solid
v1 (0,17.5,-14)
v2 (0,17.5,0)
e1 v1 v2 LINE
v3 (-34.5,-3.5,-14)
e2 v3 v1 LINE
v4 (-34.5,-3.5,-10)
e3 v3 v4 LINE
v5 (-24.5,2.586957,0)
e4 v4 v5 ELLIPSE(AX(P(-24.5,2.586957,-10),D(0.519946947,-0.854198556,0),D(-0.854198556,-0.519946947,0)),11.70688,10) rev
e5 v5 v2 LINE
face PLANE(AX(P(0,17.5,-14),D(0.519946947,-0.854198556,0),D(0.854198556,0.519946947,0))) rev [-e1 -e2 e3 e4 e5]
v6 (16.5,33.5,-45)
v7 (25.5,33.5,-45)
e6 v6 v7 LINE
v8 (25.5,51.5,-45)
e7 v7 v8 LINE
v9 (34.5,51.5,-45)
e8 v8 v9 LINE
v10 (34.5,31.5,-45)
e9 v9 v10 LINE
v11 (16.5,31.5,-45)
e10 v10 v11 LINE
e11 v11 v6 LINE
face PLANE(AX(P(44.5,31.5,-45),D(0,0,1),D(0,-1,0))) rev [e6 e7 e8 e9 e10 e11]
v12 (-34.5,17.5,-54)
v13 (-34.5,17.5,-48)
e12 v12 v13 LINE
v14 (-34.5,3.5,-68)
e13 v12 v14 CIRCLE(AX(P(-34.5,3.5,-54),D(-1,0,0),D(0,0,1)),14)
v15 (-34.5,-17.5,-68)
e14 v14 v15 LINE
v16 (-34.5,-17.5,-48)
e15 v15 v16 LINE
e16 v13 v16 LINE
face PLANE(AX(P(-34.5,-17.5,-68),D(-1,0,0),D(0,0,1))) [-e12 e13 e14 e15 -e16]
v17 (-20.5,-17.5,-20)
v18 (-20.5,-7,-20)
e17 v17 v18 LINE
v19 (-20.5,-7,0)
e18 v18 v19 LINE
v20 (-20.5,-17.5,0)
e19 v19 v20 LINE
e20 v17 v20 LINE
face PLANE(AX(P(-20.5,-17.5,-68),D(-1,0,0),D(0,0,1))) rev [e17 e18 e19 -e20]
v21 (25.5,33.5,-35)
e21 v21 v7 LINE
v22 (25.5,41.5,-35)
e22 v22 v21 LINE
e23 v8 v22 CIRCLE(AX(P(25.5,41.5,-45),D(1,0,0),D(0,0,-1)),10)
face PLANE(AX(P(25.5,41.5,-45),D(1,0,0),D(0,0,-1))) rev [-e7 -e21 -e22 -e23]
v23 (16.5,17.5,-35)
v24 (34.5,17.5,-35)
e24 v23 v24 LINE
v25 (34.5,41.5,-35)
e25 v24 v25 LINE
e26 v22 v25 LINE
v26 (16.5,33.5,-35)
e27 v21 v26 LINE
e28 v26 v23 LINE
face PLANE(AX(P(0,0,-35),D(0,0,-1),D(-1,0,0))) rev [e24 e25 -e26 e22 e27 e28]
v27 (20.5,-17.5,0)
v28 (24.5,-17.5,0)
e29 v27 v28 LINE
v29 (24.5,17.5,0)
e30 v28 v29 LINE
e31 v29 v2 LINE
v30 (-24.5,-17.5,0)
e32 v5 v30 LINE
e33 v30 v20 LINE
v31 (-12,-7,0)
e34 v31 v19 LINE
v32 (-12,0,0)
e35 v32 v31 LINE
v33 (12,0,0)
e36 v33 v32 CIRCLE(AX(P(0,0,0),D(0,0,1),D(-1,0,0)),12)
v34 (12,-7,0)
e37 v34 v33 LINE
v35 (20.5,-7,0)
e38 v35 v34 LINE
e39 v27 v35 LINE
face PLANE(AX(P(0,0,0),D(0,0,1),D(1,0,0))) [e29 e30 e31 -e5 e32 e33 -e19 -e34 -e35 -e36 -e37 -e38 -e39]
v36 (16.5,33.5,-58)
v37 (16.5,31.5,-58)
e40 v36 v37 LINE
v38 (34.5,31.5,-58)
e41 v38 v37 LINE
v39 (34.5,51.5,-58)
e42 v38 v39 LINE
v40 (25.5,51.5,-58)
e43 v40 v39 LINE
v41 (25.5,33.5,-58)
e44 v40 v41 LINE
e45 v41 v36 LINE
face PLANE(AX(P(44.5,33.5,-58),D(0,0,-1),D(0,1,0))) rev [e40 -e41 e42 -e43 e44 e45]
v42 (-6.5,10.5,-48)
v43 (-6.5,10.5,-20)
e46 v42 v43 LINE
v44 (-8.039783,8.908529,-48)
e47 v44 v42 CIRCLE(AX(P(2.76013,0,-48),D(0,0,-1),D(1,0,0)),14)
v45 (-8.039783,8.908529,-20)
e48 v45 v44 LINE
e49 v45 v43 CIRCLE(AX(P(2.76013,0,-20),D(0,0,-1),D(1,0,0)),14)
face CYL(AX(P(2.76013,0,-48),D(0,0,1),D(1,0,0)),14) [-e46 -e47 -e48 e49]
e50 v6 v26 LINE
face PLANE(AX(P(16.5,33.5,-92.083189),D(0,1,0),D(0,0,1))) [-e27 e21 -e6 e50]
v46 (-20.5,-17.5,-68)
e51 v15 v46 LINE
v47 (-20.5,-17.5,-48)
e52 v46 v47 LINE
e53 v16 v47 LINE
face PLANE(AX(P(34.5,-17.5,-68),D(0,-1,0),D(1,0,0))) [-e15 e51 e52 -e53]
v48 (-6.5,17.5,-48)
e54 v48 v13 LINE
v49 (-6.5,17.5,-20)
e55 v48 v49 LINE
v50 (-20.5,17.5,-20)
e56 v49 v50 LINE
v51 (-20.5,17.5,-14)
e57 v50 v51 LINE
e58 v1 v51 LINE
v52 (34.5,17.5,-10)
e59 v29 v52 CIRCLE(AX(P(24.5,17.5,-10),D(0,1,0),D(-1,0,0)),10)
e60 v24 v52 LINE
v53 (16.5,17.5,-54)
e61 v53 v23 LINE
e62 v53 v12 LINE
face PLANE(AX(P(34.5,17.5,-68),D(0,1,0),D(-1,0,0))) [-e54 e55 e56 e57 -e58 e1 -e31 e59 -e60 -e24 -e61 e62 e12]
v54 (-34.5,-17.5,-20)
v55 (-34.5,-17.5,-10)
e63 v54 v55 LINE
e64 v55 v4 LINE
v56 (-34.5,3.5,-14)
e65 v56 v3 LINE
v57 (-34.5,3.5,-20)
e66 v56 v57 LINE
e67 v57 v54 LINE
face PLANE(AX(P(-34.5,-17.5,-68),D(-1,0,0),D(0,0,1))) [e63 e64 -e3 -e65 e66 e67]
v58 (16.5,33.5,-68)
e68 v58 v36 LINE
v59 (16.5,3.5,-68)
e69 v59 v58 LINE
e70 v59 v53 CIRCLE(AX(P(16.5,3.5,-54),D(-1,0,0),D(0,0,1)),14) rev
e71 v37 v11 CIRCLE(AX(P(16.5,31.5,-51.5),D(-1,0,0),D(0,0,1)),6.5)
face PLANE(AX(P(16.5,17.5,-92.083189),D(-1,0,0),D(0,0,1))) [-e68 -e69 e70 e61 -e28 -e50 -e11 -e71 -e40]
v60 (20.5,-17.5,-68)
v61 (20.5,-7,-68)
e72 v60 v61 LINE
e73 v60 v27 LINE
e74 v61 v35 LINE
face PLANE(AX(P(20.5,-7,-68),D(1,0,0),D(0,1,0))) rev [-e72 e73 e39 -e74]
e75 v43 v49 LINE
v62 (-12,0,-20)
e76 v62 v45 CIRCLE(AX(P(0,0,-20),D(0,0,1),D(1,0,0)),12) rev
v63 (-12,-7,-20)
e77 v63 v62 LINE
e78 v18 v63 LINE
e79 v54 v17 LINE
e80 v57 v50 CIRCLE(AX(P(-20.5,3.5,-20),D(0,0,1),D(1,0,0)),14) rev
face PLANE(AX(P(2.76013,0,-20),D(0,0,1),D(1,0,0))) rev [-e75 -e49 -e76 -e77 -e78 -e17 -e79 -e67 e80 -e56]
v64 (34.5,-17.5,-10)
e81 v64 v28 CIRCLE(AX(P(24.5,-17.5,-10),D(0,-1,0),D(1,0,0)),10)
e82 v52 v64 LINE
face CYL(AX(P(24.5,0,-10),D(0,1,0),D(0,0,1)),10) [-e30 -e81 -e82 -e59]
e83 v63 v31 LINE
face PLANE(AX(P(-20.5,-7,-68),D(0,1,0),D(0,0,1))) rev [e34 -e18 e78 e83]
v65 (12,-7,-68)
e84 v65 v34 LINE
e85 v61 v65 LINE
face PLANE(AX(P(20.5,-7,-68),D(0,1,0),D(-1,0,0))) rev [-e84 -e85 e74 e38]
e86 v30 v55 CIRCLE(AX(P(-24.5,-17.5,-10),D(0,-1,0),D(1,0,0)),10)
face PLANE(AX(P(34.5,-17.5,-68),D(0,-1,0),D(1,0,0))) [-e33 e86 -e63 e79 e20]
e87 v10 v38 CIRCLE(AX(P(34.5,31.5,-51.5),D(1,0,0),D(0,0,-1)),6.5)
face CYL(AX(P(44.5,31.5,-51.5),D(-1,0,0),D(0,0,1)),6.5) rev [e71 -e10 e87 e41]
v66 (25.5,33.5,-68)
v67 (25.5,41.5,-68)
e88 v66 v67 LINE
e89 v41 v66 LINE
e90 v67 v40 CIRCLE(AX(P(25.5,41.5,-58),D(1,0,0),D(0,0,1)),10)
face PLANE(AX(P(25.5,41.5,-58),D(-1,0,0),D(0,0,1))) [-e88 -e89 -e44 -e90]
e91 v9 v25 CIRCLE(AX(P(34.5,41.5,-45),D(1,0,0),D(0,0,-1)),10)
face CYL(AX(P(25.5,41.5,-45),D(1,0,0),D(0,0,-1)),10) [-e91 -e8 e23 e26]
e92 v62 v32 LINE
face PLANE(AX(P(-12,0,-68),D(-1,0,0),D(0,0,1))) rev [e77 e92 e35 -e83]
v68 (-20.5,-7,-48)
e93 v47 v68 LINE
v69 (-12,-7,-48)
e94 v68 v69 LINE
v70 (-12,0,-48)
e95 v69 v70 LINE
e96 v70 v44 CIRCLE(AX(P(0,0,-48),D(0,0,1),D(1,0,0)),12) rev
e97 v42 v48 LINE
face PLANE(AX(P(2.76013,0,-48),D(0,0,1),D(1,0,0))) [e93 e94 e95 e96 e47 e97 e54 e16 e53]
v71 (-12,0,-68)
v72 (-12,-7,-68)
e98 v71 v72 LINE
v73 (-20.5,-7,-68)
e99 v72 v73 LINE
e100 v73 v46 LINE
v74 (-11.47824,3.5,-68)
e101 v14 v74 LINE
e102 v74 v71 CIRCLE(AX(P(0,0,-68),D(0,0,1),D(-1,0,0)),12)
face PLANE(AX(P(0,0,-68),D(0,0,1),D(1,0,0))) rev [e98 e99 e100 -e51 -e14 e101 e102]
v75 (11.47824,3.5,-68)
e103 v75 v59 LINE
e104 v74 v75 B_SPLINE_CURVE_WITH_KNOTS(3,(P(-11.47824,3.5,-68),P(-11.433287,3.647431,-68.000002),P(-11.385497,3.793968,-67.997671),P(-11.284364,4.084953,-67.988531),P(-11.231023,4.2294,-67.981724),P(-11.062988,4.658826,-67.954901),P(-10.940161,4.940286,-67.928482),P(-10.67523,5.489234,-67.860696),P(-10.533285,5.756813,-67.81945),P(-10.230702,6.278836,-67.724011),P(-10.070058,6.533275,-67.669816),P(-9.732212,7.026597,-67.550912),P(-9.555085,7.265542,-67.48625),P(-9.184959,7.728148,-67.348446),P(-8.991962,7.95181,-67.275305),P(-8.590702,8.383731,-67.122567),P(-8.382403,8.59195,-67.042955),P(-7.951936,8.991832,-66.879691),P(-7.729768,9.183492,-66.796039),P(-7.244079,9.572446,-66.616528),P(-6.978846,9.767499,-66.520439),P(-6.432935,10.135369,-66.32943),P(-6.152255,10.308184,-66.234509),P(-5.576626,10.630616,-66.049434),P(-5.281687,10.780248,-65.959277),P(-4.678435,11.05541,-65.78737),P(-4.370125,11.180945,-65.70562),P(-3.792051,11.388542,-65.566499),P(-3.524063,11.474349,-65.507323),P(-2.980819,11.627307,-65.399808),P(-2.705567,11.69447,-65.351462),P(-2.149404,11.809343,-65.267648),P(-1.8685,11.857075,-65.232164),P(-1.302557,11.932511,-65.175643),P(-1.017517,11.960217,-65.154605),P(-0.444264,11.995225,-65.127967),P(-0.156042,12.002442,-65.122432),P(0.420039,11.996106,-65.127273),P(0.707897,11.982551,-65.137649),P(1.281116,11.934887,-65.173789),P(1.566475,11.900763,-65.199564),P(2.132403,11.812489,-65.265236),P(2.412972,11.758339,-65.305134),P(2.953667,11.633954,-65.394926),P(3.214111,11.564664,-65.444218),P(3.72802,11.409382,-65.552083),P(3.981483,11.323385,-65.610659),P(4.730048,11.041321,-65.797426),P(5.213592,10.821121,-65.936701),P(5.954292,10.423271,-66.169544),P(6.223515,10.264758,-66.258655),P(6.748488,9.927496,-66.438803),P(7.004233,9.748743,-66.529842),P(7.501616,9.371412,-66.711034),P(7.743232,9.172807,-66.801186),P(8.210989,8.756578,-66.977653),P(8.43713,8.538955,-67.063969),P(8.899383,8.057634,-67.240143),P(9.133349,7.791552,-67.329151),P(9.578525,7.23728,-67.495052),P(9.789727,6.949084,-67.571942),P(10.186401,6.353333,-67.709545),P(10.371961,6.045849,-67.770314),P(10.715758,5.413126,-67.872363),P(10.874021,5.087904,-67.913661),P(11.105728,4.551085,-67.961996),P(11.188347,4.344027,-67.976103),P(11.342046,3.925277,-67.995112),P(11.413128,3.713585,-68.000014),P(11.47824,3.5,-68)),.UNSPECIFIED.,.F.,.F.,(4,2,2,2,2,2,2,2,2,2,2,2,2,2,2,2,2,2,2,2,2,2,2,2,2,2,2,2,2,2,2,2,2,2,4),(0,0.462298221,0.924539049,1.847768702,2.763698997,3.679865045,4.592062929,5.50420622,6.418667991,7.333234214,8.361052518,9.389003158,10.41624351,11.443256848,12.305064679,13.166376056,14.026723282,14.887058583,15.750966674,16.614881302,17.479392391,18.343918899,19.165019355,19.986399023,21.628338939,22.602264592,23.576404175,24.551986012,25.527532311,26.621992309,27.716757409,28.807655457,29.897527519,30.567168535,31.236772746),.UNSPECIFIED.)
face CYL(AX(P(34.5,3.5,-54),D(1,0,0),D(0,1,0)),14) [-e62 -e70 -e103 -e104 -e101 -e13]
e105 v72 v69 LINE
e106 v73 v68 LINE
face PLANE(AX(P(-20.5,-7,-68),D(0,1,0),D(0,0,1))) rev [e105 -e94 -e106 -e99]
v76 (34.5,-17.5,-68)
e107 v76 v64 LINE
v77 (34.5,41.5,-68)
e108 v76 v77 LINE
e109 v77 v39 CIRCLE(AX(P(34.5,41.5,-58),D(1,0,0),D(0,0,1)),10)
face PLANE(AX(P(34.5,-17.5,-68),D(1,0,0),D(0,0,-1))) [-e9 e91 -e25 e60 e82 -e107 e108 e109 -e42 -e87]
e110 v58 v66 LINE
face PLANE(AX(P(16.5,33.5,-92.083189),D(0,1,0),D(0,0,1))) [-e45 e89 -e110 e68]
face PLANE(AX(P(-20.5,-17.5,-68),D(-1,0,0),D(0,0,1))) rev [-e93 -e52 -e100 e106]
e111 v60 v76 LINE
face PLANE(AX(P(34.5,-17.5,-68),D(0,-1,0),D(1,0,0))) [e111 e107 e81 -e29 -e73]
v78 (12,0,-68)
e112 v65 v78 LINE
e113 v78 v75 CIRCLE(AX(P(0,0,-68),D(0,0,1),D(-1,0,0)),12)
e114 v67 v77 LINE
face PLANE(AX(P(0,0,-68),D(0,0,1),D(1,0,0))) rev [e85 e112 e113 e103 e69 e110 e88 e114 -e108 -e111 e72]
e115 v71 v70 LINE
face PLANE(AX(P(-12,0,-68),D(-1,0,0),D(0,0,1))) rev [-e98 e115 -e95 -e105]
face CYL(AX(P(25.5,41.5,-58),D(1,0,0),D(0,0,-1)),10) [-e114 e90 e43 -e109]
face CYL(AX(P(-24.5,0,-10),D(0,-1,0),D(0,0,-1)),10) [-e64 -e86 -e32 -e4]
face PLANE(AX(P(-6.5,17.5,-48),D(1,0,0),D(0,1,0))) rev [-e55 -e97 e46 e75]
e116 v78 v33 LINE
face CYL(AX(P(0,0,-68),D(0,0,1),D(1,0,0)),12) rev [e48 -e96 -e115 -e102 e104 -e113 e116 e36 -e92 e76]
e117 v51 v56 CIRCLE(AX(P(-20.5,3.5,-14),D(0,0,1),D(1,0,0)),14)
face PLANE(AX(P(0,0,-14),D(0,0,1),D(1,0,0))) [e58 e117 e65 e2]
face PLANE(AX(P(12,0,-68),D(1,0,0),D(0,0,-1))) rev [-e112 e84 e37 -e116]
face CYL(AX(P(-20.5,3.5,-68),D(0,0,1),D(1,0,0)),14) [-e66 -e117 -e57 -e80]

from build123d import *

# Parameters (mm, degrees)
SKETCH1_W           = 69
SKETCH1_H           = 35
BOSS_EXTRUDE1_DEPTH = 68
CUT_EXTRUDE1_DEPTH  = 79.233624485
FILLET1_R           = 10
CUT_EXTRUDE2_DEPTH  = 14
CUT_EXTRUDE3_DEPTH  = 14
SKETCH6_W           = 18
SKETCH6_H           = 16
BOSS_EXTRUDE2_DEPTH = 33
CUT_EXTRUDE4_DEPTH  = 28
FILLET3_R           = 14
BOSS_EXTRUDE3_DEPTH = 9
FILLET4_R           = 14


with BuildPart() as part:
    # Sketch1 → Boss-Extrude1 (new body)
    with BuildSketch(Plane.XY):
        Rectangle(SKETCH1_W, SKETCH1_H)
    extrude(amount=-BOSS_EXTRUDE1_DEPTH)

    # Sketch2 → Cut-Extrude1 (cut, through all)
    with BuildSketch(Plane.XY):
        with BuildLine():
            Line((-20.5, -17.5), (-20.5, -7))
            Line((-20.5, -7), (-12, -7))
            Line((-12, -7), (-12, 0))
            ThreePointArc((-12, 0), (0, 12), (12, 0))
            Line((12, 0), (12, -7))
            Line((12, -7), (20.5, -7))
            Line((20.5, -7), (20.5, -17.5))
            Line((20.5, -17.5), (-20.5, -17.5))
        make_face()
    extrude(amount=-CUT_EXTRUDE1_DEPTH, mode=Mode.SUBTRACT)

    # Fillet1
    fillet1_edges = [part.edges().sort_by_distance(p)[0] for p in [
        (34.5, 0, 0),
        (-34.5, 0, 0),
    ]]
    fillet(fillet1_edges, radius=FILLET1_R)

    # Sketch4 → Cut-Extrude2 (cut)
    with BuildSketch(Plane.XY):
        Polygon((0, 17.5), (-34.5, -3.5), (-34.5, 17.5), align=None)
    extrude(amount=-CUT_EXTRUDE2_DEPTH, mode=Mode.SUBTRACT)

    # Sketch5 → Cut-Extrude3 (cut, symmetric)
    with BuildSketch(Plane.XY.offset(-34)):
        with BuildLine():
            Line((-34.5, -17.5), (-20.5, -17.5))
            Line((-20.5, -17.5), (-20.5, -10.5))
            Line((-20.5, -10.5), (-11.239870411, -10.5))
            Line((-11.239870411, -10.5), (-11.239870411, 0))
            ThreePointArc((-11.239870411, 0), (-10, 5.760129589), (-6.5, 10.5))
            Line((-6.5, 10.5), (-6.5, 17.5))
            Line((-6.5, 17.5), (-34.5, 17.5))
            Line((-34.5, 17.5), (-34.5, -17.5))
        make_face()
    extrude(amount=CUT_EXTRUDE3_DEPTH, both=True, mode=Mode.SUBTRACT)

    # Sketch6 → Boss-Extrude2 (add)
    with BuildSketch(Plane.XY.offset(-35)):
        with Locations((25.5, 25.5)):
            Rectangle(SKETCH6_W, SKETCH6_H)
    extrude(amount=-BOSS_EXTRUDE2_DEPTH)

    # Sketch7 → Cut-Extrude4 (cut)
    with BuildSketch(Plane.ZY.offset(-16.5)):
        with BuildLine():
            Line((-58, 33.5), (-58, 31.5))
            ThreePointArc((-58, 31.5), (-51.5, 25), (-45, 31.5))
            Line((-45, 31.5), (-45, 33.5))
            Line((-45, 33.5), (-58, 33.5))
        make_face()
    extrude(amount=-CUT_EXTRUDE4_DEPTH, mode=Mode.SUBTRACT)

    # Fillet3
    # the kernel refuses this fillet: 14 mm, written as the material it takes off along each edge
    with BuildSketch(Plane(origin=(-69.5, 17.5, -68), x_dir=(0, -1, 0), z_dir=(1, 0, 0))) as fillet3_piece_1:
        with BuildLine():
            CenterArc((FILLET3_R, -FILLET3_R), FILLET3_R, 90, 90)
            Line((0, -FILLET3_R), (0, 0))
            Line((0, 0), (FILLET3_R, 0))
        make_face()
    extrude(amount=86, mode=Mode.SUBTRACT)

    # Sketch9 → Boss-Extrude3 (add)
    with BuildSketch(Plane(origin=(34.5, 0, 0), x_dir=(0, 0, -1), z_dir=(1, 0, 0))):
        with BuildLine():
            Line((58, 33.5), (58, 51.5))
            ThreePointArc((58, 51.5), (65.071067812, 48.571067812), (68, 41.5))
            Line((68, 41.5), (68, 33.5))
            Line((68, 33.5), (58, 33.5))
        make_face()
        with BuildLine():
            Line((45, 33.5), (45, 51.5))
            ThreePointArc((45, 51.5), (37.928932188, 48.571067812), (35, 41.5))
            Line((35, 41.5), (35, 33.5))
            Line((35, 33.5), (45, 33.5))
        make_face()
    extrude(amount=-BOSS_EXTRUDE3_DEPTH)

    # Fillet4
    fillet4_edges = [part.edges().sort_by_distance(p)[0] for p in [
        (-34.5, 17.5, -17),
    ]]
    fillet(fillet4_edges, radius=FILLET4_R)


solid = part.part
